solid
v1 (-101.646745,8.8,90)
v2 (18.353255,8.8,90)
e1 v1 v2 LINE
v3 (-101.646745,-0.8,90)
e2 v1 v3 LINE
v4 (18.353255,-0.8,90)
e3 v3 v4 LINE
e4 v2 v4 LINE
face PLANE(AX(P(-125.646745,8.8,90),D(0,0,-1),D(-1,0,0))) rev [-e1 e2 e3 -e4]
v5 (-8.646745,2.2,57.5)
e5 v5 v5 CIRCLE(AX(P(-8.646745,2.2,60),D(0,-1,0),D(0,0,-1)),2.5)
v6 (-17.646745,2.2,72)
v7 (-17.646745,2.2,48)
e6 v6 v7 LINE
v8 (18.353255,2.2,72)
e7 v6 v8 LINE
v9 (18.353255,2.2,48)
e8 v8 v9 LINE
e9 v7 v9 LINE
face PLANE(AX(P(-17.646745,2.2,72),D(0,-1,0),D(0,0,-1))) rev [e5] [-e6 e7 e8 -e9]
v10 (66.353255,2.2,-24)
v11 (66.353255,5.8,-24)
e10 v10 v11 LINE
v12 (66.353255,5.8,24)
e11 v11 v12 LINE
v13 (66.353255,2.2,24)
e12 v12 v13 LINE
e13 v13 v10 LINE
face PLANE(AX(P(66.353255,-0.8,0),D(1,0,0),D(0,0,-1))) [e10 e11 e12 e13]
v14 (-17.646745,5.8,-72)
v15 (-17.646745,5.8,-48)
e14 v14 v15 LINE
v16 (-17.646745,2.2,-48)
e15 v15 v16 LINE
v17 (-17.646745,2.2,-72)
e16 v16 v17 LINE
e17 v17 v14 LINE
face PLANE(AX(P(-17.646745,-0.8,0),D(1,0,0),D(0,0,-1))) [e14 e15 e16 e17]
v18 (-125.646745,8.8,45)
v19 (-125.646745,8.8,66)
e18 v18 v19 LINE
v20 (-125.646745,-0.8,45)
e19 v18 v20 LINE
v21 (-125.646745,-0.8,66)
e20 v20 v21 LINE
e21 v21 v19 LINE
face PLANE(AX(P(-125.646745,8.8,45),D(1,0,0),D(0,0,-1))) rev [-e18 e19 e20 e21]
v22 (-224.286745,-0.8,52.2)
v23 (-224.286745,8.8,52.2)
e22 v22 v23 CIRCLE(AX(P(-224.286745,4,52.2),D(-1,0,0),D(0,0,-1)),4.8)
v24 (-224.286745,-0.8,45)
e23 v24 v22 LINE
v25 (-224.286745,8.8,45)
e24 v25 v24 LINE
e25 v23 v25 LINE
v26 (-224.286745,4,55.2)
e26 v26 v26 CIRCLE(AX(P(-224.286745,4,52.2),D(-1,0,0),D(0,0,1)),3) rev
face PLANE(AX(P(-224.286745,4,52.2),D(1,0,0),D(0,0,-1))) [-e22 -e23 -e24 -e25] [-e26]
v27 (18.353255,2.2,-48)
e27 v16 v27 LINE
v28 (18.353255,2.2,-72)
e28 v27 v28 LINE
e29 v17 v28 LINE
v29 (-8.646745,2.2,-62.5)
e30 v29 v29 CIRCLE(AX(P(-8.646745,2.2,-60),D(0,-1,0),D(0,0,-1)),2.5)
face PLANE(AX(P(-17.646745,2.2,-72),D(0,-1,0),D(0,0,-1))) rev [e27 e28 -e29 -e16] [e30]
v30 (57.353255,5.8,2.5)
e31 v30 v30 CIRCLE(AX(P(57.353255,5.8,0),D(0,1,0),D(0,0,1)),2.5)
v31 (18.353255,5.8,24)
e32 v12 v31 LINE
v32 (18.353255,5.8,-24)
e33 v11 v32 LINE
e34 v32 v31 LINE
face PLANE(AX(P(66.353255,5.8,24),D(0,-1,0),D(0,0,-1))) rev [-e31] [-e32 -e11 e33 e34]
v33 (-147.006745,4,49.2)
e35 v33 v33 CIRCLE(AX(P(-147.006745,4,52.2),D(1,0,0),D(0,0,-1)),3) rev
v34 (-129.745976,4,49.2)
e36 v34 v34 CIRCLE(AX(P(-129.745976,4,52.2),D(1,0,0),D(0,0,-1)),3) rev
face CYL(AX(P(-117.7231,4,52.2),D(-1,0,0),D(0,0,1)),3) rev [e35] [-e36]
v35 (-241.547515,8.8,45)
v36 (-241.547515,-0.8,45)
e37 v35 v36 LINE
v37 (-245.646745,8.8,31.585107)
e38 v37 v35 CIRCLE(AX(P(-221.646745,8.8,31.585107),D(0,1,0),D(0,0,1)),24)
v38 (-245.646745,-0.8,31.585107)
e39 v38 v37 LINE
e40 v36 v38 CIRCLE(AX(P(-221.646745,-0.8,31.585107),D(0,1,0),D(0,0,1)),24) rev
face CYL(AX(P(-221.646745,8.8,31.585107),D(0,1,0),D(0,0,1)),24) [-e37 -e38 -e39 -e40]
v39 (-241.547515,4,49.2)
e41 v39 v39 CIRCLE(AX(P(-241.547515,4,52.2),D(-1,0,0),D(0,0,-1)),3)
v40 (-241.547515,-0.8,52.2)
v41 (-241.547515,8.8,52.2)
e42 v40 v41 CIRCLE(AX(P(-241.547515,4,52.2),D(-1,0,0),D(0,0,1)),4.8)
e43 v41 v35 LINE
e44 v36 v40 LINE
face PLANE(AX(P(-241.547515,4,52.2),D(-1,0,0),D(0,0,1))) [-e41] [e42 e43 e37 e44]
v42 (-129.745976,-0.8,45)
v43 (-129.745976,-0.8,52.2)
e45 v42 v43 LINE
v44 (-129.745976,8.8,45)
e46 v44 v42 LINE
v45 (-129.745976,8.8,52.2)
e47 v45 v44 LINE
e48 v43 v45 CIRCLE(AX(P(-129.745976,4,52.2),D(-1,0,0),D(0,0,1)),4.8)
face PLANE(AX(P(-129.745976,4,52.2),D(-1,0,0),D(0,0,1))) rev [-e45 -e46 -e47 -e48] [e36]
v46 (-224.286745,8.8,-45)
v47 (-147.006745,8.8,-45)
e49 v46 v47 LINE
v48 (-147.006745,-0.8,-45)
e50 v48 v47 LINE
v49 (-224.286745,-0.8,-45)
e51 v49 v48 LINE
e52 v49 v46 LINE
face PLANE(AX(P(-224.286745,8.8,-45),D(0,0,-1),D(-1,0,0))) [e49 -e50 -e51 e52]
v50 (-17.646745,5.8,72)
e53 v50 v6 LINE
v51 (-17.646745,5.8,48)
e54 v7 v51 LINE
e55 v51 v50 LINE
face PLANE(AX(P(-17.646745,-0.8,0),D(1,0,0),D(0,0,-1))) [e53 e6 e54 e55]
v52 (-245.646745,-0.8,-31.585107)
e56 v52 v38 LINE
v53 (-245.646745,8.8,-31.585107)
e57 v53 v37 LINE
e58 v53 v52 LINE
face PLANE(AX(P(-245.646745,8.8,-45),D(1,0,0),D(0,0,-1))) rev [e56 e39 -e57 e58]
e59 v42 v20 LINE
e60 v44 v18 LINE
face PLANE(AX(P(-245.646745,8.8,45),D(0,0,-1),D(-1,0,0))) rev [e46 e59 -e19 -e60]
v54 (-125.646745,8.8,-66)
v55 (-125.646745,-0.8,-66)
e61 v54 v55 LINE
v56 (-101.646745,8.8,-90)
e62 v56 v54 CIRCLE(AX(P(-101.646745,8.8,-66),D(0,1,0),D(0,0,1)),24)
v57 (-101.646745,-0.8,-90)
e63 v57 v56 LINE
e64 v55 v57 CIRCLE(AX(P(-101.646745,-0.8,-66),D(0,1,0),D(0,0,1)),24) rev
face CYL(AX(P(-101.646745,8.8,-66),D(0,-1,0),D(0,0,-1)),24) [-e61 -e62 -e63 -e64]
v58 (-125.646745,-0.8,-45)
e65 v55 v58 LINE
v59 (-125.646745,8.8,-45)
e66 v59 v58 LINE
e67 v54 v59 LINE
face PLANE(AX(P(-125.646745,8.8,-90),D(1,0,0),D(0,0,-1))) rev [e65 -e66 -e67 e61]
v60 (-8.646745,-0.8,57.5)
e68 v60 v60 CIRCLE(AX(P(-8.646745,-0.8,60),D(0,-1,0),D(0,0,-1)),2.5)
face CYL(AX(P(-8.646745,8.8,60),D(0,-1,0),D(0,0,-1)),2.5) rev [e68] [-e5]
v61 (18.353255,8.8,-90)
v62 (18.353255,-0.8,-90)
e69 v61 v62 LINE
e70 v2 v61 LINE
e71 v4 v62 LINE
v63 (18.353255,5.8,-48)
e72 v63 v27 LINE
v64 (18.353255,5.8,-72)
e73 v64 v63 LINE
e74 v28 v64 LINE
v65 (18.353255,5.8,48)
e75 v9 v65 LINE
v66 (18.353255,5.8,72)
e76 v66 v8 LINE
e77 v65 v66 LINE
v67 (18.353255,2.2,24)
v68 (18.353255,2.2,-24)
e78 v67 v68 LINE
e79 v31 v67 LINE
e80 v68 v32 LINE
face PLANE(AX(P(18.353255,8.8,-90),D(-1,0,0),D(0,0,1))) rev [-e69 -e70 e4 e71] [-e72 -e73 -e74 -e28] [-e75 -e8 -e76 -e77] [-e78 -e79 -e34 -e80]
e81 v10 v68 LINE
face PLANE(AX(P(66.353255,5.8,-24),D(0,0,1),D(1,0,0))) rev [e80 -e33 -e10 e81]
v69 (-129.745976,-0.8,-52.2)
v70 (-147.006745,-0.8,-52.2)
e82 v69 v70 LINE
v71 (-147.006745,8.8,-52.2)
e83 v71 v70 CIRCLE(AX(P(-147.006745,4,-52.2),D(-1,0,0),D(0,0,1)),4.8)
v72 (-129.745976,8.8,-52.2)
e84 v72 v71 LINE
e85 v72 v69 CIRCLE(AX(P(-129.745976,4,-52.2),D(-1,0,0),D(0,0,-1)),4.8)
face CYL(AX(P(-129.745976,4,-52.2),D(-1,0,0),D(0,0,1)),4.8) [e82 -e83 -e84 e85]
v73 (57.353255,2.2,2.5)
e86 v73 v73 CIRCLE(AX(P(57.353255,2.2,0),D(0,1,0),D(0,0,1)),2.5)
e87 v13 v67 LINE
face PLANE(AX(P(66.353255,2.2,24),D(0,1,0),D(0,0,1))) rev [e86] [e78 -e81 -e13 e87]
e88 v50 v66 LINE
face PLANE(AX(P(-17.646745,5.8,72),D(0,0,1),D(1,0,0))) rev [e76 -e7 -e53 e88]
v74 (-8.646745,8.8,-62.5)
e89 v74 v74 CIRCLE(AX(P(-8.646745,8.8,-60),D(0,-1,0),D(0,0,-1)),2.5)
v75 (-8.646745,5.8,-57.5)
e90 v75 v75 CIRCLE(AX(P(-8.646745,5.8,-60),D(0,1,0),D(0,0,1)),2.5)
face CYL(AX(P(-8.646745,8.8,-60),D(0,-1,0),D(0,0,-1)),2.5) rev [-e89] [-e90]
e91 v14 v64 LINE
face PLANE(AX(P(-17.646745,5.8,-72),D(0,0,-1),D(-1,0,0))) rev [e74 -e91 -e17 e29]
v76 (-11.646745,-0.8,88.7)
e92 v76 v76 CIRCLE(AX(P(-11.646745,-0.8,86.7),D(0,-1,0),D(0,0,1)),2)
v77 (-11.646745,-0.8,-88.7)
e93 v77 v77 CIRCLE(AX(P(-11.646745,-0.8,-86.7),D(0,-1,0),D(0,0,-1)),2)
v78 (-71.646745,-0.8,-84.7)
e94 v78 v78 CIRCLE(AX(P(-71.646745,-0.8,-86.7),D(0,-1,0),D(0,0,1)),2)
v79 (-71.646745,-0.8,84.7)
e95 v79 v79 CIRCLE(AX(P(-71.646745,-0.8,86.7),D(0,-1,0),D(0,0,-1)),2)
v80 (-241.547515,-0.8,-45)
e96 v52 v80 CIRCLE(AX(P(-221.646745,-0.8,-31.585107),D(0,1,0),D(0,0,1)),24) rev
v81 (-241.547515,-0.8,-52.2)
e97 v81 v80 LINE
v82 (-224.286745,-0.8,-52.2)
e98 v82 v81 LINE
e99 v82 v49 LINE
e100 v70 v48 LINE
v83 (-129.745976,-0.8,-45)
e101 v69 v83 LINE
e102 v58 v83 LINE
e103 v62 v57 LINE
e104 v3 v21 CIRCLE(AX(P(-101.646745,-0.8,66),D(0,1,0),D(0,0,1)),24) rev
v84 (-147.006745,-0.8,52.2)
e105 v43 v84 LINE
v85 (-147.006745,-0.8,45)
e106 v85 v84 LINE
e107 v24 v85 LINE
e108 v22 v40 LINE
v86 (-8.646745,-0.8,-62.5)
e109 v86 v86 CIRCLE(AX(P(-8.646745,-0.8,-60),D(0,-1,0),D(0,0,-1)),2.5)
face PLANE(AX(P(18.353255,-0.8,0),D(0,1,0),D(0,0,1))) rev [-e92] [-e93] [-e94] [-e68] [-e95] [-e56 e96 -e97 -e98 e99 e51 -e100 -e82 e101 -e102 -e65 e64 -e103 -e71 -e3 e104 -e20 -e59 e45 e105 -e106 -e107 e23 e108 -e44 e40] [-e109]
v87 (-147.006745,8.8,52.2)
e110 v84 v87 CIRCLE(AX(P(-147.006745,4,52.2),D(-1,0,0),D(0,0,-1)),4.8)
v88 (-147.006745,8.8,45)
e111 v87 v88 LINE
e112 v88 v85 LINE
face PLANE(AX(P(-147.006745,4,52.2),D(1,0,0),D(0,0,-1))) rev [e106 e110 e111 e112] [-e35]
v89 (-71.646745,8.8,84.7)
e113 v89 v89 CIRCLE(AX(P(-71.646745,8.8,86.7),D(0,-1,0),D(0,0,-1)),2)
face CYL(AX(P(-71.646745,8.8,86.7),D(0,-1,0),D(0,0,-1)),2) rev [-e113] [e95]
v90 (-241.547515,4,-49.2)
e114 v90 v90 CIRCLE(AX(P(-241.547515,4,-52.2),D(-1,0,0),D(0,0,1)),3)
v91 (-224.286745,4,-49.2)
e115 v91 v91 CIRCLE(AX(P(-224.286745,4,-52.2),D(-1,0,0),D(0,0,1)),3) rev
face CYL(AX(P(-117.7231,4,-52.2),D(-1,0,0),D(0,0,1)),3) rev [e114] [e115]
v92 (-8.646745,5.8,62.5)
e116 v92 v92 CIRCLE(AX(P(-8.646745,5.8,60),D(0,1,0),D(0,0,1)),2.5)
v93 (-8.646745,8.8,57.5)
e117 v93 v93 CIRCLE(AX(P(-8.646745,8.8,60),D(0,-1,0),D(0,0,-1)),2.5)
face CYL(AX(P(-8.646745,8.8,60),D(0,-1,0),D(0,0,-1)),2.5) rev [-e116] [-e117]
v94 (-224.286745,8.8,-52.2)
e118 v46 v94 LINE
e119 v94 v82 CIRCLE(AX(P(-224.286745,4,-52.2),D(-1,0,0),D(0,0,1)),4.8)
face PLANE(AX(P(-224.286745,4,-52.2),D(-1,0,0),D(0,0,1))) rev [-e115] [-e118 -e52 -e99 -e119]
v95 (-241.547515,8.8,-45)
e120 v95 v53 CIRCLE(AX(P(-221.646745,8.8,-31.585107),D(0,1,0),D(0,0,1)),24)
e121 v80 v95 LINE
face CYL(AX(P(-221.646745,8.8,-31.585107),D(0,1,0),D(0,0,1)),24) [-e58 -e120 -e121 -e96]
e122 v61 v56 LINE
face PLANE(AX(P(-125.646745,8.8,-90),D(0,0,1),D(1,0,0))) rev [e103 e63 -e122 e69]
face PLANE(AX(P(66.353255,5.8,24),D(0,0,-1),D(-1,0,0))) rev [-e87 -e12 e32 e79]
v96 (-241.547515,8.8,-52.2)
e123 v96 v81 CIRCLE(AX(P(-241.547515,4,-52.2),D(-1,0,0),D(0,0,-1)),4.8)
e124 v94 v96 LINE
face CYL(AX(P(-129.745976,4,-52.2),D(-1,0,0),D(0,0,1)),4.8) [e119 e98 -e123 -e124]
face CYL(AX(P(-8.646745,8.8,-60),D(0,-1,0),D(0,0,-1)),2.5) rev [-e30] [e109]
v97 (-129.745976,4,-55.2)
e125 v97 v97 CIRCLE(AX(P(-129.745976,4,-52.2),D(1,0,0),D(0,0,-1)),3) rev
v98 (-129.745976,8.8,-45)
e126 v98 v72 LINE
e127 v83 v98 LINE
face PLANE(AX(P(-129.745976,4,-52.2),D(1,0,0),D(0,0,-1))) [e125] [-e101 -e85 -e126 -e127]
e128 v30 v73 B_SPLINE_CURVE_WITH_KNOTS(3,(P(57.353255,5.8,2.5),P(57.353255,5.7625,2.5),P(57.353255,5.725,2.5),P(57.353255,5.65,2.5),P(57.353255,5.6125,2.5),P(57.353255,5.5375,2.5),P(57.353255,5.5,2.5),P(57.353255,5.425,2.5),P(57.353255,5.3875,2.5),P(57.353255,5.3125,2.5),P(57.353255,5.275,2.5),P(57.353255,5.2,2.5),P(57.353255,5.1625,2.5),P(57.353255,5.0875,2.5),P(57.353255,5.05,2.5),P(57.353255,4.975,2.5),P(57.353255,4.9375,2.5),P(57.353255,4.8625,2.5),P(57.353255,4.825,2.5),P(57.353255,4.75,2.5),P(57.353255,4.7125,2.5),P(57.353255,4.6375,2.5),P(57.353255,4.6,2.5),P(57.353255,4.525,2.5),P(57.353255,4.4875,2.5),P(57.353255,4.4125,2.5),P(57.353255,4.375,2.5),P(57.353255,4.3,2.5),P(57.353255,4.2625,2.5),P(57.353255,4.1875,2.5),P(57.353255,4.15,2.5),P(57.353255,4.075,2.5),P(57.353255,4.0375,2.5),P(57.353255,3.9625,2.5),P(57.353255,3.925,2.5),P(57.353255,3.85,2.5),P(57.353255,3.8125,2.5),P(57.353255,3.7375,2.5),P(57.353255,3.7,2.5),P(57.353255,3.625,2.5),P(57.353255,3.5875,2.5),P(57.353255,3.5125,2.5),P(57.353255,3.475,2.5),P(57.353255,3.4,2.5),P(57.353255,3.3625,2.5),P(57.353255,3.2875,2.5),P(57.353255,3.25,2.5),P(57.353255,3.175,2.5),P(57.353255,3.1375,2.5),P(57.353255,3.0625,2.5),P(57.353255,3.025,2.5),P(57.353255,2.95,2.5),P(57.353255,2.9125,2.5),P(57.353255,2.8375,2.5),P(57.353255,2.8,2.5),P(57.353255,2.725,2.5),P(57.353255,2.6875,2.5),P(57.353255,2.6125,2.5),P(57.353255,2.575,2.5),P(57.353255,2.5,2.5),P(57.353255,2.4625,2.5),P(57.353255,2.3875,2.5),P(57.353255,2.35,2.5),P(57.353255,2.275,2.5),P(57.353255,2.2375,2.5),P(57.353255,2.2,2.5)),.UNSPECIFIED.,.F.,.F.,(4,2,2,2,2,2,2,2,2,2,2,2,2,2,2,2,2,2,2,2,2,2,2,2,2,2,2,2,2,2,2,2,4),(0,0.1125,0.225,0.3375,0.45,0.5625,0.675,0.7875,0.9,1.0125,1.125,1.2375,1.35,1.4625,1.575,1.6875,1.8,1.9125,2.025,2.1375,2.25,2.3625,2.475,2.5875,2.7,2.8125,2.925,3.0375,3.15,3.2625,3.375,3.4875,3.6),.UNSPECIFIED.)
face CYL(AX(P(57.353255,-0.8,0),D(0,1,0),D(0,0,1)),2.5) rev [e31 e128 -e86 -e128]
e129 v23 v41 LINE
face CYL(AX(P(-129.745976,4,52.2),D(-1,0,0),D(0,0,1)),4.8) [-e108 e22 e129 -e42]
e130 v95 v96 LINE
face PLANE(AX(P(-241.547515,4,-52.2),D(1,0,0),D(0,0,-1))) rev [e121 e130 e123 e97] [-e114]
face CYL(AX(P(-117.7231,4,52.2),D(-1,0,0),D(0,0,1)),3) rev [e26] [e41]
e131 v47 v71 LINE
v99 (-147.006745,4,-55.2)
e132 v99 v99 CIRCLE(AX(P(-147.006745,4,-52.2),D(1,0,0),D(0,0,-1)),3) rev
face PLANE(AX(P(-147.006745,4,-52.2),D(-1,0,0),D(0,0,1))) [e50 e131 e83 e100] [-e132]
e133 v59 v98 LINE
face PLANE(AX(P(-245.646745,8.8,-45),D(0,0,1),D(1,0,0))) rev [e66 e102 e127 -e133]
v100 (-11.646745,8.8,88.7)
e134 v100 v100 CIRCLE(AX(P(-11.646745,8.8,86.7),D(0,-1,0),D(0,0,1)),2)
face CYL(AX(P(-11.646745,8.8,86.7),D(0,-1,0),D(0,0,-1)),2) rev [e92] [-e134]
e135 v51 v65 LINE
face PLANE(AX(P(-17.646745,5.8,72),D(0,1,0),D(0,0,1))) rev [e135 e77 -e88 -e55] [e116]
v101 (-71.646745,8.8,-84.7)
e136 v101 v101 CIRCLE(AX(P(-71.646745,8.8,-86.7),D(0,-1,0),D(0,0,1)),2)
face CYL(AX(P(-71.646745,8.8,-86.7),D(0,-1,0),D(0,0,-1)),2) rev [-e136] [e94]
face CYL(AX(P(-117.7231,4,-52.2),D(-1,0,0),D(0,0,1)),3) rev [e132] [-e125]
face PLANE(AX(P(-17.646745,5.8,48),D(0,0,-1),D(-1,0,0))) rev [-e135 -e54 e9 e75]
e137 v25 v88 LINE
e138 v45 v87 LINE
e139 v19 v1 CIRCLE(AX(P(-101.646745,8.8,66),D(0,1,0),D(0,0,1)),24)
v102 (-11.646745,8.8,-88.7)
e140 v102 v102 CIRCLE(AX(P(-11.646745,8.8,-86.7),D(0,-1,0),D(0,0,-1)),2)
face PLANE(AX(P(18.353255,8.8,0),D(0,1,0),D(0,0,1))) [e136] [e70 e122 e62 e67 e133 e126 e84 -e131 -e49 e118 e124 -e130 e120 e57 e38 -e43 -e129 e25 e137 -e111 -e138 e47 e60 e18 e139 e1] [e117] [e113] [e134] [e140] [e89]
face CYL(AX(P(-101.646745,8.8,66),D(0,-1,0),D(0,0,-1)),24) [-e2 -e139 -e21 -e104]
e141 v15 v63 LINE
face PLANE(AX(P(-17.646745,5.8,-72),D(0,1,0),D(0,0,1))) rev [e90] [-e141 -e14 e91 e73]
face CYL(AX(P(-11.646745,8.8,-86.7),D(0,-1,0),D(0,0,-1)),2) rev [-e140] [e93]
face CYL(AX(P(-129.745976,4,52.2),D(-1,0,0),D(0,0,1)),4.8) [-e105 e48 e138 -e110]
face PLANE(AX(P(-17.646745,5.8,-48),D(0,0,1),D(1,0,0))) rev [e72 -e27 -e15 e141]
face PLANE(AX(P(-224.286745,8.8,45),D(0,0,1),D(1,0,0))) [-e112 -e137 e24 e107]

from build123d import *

# Parameters (mm, degrees)
BOSS_EXTRUDE1_DEPTH      = 8
BOSS_EXTRUDE2_DEPTH      = 46.583974855
BOSS_EXTRUDE2_DEPTH_BACK = 46.58397486
SKETCH4_R                = 3.3
CUT_EXTRUDE1_DEPTH       = 32.2
CUT_EXTRUDE1_DEPTH_BACK  = 32.2
SKETCH5_R                = 3.3
SKETCH6_W                = 40
SKETCH6_H                = 3
BOSS_EXTRUDE3_DEPTH      = 40
SKETCH7_R                = 2
CUT_EXTRUDE2_DEPTH       = 233.497849452
SKETCH8_W                = 20
SKETCH8_H                = 3
CUT_EXTRUDE3_DEPTH       = 30
SKETCH9_R                = 2
CUT_EXTRUDE4_DEPTH       = 233.570419443
FILLET1_R                = 20
SKETCH10_R               = 1.5
CUT_EXTRUDE5_DEPTH       = 10
SCALE1_SCALE             = 1.5
SCALE2_SCALE             = 0.8
SKETCH12_R               = 1.8
BOSS_EXTRUDE4_DEPTH      = 9.6
SKETCH13_R               = 2
SKETCH13_R_2             = 2.5
CUT_EXTRUDE6_DEPTH       = 262.790915701
BOSS_EXTRUDE5_REACH      = 322.905
SKETCH14_R               = 4.250728377
SKETCH14_R_2             = 3
SKETCH15_W               = 77.28
SKETCH15_H               = 12
CUT_EXTRUDE7_DEPTH       = 262.790915701
BOSS_EXTRUDE6_START      = -3.6
SKETCH16_R               = 2.5
BOSS_EXTRUDE6_DEPTH      = 3.6
SKETCH17_R               = 2.5
CUT_EXTRUDE8_DEPTH       = 262.698077073


with BuildPart() as part:
    # Sketch1 → Boss-Extrude1 (new body)
    with BuildSketch(Plane(origin=(0, 0, 0), x_dir=(1, 0, 0), z_dir=(0, 1, 0))):
        Polygon((-120, -37.5), (-120, -75), (0, -75), (0, 75), (-120, 75), (-120, 37.5), (-220, 37.5), (-220, -37.5), align=None)
    extrude(amount=BOSS_EXTRUDE1_DEPTH)

    # Sketch4 → Boss-Extrude2 (add, two sides: drawn at the far end of the back side and taken through both)
    # profile 1 of 2: a face of its own
    with BuildSketch(Plane.ZY.offset(170).offset(-BOSS_EXTRUDE2_DEPTH_BACK)):
        with BuildLine():
            Line((37.5, 8), (43.5, 8))
            ThreePointArc((43.5, 8), (47.5, 4), (43.5, 0))
            Line((43.5, 0), (37.5, 0))
            Line((37.5, 0), (37.5, 8))
        make_face()
        with Locations((43.5, 4)):
            Circle(SKETCH4_R, mode=Mode.SUBTRACT)
    # profile 2 of 2: a face of its own
    with BuildSketch(Plane.ZY.offset(170).offset(-BOSS_EXTRUDE2_DEPTH_BACK)):
        with BuildLine():
            Line((-37.5, 0), (-43.5, 0))
            ThreePointArc((-43.5, 0), (-47.5, 4), (-43.5, 8))
            Line((-43.5, 8), (-37.5, 8))
            Line((-37.5, 8), (-37.5, 0))
        make_face()
        with Locations((-43.5, 4)):
            Circle(SKETCH4_R, mode=Mode.SUBTRACT)
    extrude(amount=BOSS_EXTRUDE2_DEPTH + BOSS_EXTRUDE2_DEPTH_BACK)

    # Sketch5 → Cut-Extrude1 (cut, two sides: drawn at the far end of the back side and taken through both)
    # profile 1 of 2: a face of its own
    with BuildSketch(Plane.ZY.offset(170).offset(-CUT_EXTRUDE1_DEPTH_BACK)):
        with BuildLine():
            Line((-43.5, 8), (-37.5, 8))
            Line((-37.5, 8), (-37.5, 0))
            Line((-37.5, 0), (-43.5, 0))
            ThreePointArc((-43.5, 0), (-47.5, 4), (-43.5, 8))
        make_face()
        with Locations((-43.5, 4)):
            Circle(SKETCH5_R, mode=Mode.SUBTRACT)
    # profile 2 of 2: a face of its own
    with BuildSketch(Plane.ZY.offset(170).offset(-CUT_EXTRUDE1_DEPTH_BACK)):
        with BuildLine():
            Line((37.5, 0), (43.5, 0))
            ThreePointArc((43.5, 0), (47.5, 4), (43.5, 8))
            Line((43.5, 8), (37.5, 8))
            Line((37.5, 8), (37.5, 0))
        make_face()
        with Locations((43.5, 4)):
            Circle(SKETCH5_R, mode=Mode.SUBTRACT)
    extrude(amount=CUT_EXTRUDE1_DEPTH + CUT_EXTRUDE1_DEPTH_BACK, mode=Mode.SUBTRACT)

    # Sketch6 → Boss-Extrude3 (add)
    with BuildSketch(Plane(origin=(0, 0, 0), x_dir=(0, 0, -1), z_dir=(1, 0, 0))):
        with Locations((0, 4)):
            Rectangle(SKETCH6_W, SKETCH6_H)
    extrude(amount=BOSS_EXTRUDE3_DEPTH)

    # Sketch7 → Cut-Extrude2 (cut, through all)
    with BuildSketch(Plane(origin=(0, 5.5, 0), x_dir=(1, 0, 0), z_dir=(0, 1, 0))):
        with Locations(Location((32.75, 0, 0), (0, 0, 270))):
            Circle(SKETCH7_R)
    extrude(amount=-CUT_EXTRUDE2_DEPTH, mode=Mode.SUBTRACT)

    # Sketch8 → Cut-Extrude3 (cut)
    with BuildSketch(Plane(origin=(0, 0, 0), x_dir=(0, 0, -1), z_dir=(1, 0, 0))):
        with Locations((-50, 4)):
            Rectangle(SKETCH8_W, SKETCH8_H)
        with Locations((50, 4)):
            Rectangle(SKETCH8_W, SKETCH8_H)
    extrude(amount=-CUT_EXTRUDE3_DEPTH, mode=Mode.SUBTRACT)

    # Sketch9 → Cut-Extrude4 (cut, through all)
    with BuildSketch(Plane(origin=(0, 8, 0), x_dir=(1, 0, 0), z_dir=(0, 1, 0))):
        with Locations(Location((-22.5, -50, 0), (0, 0, 270))):
            Circle(SKETCH9_R)
        with Locations(Location((-22.5, 50, 0), (0, 0, 90))):
            Circle(SKETCH9_R)
    extrude(amount=-CUT_EXTRUDE4_DEPTH, mode=Mode.SUBTRACT)

    # Fillet1
    # the kernel refuses this fillet: 20 mm, written as the material it takes off along each edge
    with BuildSketch(Plane(origin=(-220, -27.947694226, 37.5), x_dir=(1, 0, 0), z_dir=(0, 1, 0))) as fillet1_piece_1:
        with BuildLine():
            CenterArc((20, 11.17907769), FILLET1_R, 180, 33.98348272)
            Line((0, 11.17907769), (-0.4, 11.17907769))
            Line((-0.4, 11.17907769), (-0.4, 0))
            Line((-0.4, 0), (0, -0.4))
            ThreePointArc((0, -0.4), (1.708012572, -0.4), (3.084345648, -0.223581554))
            Line((3.084345648, -0.223581554), (3.416025145, 0))
        make_face()
    extrude(amount=63.895388452, mode=Mode.SUBTRACT)
    with BuildSketch(Plane(origin=(-220, -27.947694226, -37.5), x_dir=(0, 0, 1), z_dir=(0, 1, 0))) as fillet1_piece_2:
        with BuildLine():
            CenterArc((11.17907769, 20), FILLET1_R, 236.01651728, 33.98348272)
            Line((0, 3.416025145), (-0.223581554, 3.084345648))
            ThreePointArc((-0.223581554, 3.084345648), (-0.4, 1.708012572), (-0.4, 0))
            Line((-0.4, 0), (0, -0.4))
            Line((0, -0.4), (11.17907769, -0.4))
            Line((11.17907769, -0.4), (11.17907769, 0))
        make_face()
    extrude(amount=63.895388452, mode=Mode.SUBTRACT)
    with BuildSketch(Plane(origin=(-120, -50, -75), x_dir=(1, 0, 0), z_dir=(0, 1, 0)), Plane(origin=(-120, -50, 75), x_dir=(0, 0, -1), z_dir=(0, 1, 0))) as fillet1_piece_3:
        with BuildLine():
            CenterArc((FILLET1_R, -FILLET1_R), FILLET1_R, 90, 90)
            Line((0, -FILLET1_R), (-FILLET1_R * 0.02, -FILLET1_R))
            Line((-FILLET1_R * 0.02, -FILLET1_R), (-FILLET1_R * 0.02, FILLET1_R * 0.02))
            Line((-FILLET1_R * 0.02, FILLET1_R * 0.02), (FILLET1_R, FILLET1_R * 0.02))
            Line((FILLET1_R, FILLET1_R * 0.02), (FILLET1_R, 0))
        make_face()
    extrude(amount=108, mode=Mode.SUBTRACT)

    # Sketch10 → Cut-Extrude5 (cut)
    with BuildSketch(Plane(origin=(0, 8, 0), x_dir=(1, 0, 0), z_dir=(0, 1, 0))):
        with Locations(Location((-25, 72.5, 0), (0, 0, 270))):
            Circle(SKETCH10_R)
        with Locations(Location((-75, 72.5, 0), (0, 0, 270))):
            Circle(SKETCH10_R)
        with Locations(Location((-25, -72.5, 0), (0, 0, 270))):
            Circle(SKETCH10_R)
        with Locations(Location((-75, -72.5, 0), (0, 0, 270))):
            Circle(SKETCH10_R)
    extrude(amount=-CUT_EXTRUDE5_DEPTH, mode=Mode.SUBTRACT)


with BuildPart() as part_1:
    # Scale1: scaled about (-91.766272815, 4, 0)
    add(part.part.scale(SCALE1_SCALE).moved(Location((45.883136407, -2, 0))))


with BuildPart() as part_2:
    # Scale2: scaled about (-91.766272815, 4, 0)
    add(part_1.part.scale(SCALE2_SCALE).moved(Location((-18.353254563, 0.8, 0))))

    # Sketch12 → Boss-Extrude4 (add, through all)
    with BuildSketch(Plane(origin=(0, 8.8, 0), x_dir=(1, 0, 0), z_dir=(0, 1, 0))):
        with Locations((-71.646745437, 87)):
            Circle(SKETCH12_R)
        with Locations((-11.646745437, 87)):
            Circle(SKETCH12_R)
        with Locations((-11.646745437, -87)):
            Circle(SKETCH12_R)
        with Locations((-71.646745437, -87)):
            Circle(SKETCH12_R)
    extrude(amount=-BOSS_EXTRUDE4_DEPTH)

    # Sketch13 → Cut-Extrude6 (cut, through all)
    with BuildSketch(Plane.XZ.offset(0.8)):
        with Locations(Location((-71.646745437, 86.7, 0), (0, 0, 270))):
            Circle(SKETCH13_R)
        with Locations(Location((-11.646745437, 86.7, 0), (0, 0, 90))):
            Circle(SKETCH13_R)
        with Locations(Location((-11.646745437, -86.7, 0), (0, 0, 270))):
            Circle(SKETCH13_R)
        with Locations(Location((-71.646745437, -86.7, 0), (0, 0, 90))):
            Circle(SKETCH13_R)
        with Locations(Location((-8.646745437, 60, 0), (0, 0, 270))):
            Circle(SKETCH13_R_2)
        with Locations(Location((57.653254563, 0, 0), (0, 0, 270))):
            Circle(SKETCH13_R_2)
        with Locations(Location((-8.646745437, -60, 0), (0, 0, 270))):
            Circle(SKETCH13_R_2)
    extrude(amount=-CUT_EXTRUDE6_DEPTH, mode=Mode.SUBTRACT)

    # Boss-Extrude5: up to this face of the body (flat: up to its plane)
    boss_extrude5_end = Plane(part_2.part.faces().sort_by_distance((-129.745975605, 8.646325018, -48.6))[0])
    # Sketch14 → Boss-Extrude5 (add, up to the picked face)
    with BuildSketch(Plane.ZY.offset(241.547515263), mode=Mode.PRIVATE) as boss_extrude5_sk1:
        with Locations((-52.2, 4)):
            Circle(SKETCH14_R)
        with Locations((-52.2, 4)):
            Circle(SKETCH14_R_2, mode=Mode.SUBTRACT)
    boss_extrude5_tool1 = split(extrude(boss_extrude5_sk1.sketch, amount=-BOSS_EXTRUDE5_REACH, mode=Mode.PRIVATE), bisect_by=boss_extrude5_end, keep=Keep.BOTH, mode=Mode.PRIVATE)
    # Sketch14 → Boss-Extrude5 (add, up to the picked face)
    with BuildSketch(Plane.ZY.offset(241.547515263), mode=Mode.PRIVATE) as boss_extrude5_sk2:
        with Locations(Location((52.2, 4, 0), (0, 0, 180))):
            Circle(SKETCH14_R)
        with Locations(Location((52.2, 4, 0), (0, 0, 180))):
            Circle(SKETCH14_R_2, mode=Mode.SUBTRACT)
    boss_extrude5_tool2 = split(extrude(boss_extrude5_sk2.sketch, amount=-BOSS_EXTRUDE5_REACH, mode=Mode.PRIVATE), bisect_by=boss_extrude5_end, keep=Keep.BOTH, mode=Mode.PRIVATE)
    add(boss_extrude5_tool1.solids().sort_by(Axis((-241.547515, 4, -56.3305), (1, 0, 0)))[0])
    add(boss_extrude5_tool2.solids().sort_by(Axis((-241.547515, 4, 56.3305), (1, 0, 0)))[0])

    # Sketch15 → Cut-Extrude7 (cut, through all)
    with BuildSketch(Plane(origin=(0, 8.8, 0), x_dir=(1, 0, 0), z_dir=(0, 1, 0))):
        with Locations((-185.646745437, 51)):
            Rectangle(SKETCH15_W, SKETCH15_H)
        with Locations((-185.646745437, -51)):
            Rectangle(SKETCH15_W, SKETCH15_H)
    extrude(amount=-CUT_EXTRUDE7_DEPTH, mode=Mode.SUBTRACT)

    # Sketch16 → Boss-Extrude6 (add)
    with BuildSketch(Plane(origin=(0, 5.8, 0), x_dir=(1, 0, 0), z_dir=(0, 1, 0)).offset(BOSS_EXTRUDE6_START)):
        with Locations((57.653254563, 0)):
            Circle(SKETCH16_R)
    extrude(amount=BOSS_EXTRUDE6_DEPTH)

    # Sketch17 → Cut-Extrude8 (cut, through all)
    with BuildSketch(Plane(origin=(0, 5.8, 0), x_dir=(1, 0, 0), z_dir=(0, 1, 0))):
        with Locations(Location((57.353254563, 0, 0), (0, 0, 270))):
            Circle(SKETCH17_R)
    extrude(amount=-CUT_EXTRUDE8_DEPTH, mode=Mode.SUBTRACT)


solid = part_2.part
